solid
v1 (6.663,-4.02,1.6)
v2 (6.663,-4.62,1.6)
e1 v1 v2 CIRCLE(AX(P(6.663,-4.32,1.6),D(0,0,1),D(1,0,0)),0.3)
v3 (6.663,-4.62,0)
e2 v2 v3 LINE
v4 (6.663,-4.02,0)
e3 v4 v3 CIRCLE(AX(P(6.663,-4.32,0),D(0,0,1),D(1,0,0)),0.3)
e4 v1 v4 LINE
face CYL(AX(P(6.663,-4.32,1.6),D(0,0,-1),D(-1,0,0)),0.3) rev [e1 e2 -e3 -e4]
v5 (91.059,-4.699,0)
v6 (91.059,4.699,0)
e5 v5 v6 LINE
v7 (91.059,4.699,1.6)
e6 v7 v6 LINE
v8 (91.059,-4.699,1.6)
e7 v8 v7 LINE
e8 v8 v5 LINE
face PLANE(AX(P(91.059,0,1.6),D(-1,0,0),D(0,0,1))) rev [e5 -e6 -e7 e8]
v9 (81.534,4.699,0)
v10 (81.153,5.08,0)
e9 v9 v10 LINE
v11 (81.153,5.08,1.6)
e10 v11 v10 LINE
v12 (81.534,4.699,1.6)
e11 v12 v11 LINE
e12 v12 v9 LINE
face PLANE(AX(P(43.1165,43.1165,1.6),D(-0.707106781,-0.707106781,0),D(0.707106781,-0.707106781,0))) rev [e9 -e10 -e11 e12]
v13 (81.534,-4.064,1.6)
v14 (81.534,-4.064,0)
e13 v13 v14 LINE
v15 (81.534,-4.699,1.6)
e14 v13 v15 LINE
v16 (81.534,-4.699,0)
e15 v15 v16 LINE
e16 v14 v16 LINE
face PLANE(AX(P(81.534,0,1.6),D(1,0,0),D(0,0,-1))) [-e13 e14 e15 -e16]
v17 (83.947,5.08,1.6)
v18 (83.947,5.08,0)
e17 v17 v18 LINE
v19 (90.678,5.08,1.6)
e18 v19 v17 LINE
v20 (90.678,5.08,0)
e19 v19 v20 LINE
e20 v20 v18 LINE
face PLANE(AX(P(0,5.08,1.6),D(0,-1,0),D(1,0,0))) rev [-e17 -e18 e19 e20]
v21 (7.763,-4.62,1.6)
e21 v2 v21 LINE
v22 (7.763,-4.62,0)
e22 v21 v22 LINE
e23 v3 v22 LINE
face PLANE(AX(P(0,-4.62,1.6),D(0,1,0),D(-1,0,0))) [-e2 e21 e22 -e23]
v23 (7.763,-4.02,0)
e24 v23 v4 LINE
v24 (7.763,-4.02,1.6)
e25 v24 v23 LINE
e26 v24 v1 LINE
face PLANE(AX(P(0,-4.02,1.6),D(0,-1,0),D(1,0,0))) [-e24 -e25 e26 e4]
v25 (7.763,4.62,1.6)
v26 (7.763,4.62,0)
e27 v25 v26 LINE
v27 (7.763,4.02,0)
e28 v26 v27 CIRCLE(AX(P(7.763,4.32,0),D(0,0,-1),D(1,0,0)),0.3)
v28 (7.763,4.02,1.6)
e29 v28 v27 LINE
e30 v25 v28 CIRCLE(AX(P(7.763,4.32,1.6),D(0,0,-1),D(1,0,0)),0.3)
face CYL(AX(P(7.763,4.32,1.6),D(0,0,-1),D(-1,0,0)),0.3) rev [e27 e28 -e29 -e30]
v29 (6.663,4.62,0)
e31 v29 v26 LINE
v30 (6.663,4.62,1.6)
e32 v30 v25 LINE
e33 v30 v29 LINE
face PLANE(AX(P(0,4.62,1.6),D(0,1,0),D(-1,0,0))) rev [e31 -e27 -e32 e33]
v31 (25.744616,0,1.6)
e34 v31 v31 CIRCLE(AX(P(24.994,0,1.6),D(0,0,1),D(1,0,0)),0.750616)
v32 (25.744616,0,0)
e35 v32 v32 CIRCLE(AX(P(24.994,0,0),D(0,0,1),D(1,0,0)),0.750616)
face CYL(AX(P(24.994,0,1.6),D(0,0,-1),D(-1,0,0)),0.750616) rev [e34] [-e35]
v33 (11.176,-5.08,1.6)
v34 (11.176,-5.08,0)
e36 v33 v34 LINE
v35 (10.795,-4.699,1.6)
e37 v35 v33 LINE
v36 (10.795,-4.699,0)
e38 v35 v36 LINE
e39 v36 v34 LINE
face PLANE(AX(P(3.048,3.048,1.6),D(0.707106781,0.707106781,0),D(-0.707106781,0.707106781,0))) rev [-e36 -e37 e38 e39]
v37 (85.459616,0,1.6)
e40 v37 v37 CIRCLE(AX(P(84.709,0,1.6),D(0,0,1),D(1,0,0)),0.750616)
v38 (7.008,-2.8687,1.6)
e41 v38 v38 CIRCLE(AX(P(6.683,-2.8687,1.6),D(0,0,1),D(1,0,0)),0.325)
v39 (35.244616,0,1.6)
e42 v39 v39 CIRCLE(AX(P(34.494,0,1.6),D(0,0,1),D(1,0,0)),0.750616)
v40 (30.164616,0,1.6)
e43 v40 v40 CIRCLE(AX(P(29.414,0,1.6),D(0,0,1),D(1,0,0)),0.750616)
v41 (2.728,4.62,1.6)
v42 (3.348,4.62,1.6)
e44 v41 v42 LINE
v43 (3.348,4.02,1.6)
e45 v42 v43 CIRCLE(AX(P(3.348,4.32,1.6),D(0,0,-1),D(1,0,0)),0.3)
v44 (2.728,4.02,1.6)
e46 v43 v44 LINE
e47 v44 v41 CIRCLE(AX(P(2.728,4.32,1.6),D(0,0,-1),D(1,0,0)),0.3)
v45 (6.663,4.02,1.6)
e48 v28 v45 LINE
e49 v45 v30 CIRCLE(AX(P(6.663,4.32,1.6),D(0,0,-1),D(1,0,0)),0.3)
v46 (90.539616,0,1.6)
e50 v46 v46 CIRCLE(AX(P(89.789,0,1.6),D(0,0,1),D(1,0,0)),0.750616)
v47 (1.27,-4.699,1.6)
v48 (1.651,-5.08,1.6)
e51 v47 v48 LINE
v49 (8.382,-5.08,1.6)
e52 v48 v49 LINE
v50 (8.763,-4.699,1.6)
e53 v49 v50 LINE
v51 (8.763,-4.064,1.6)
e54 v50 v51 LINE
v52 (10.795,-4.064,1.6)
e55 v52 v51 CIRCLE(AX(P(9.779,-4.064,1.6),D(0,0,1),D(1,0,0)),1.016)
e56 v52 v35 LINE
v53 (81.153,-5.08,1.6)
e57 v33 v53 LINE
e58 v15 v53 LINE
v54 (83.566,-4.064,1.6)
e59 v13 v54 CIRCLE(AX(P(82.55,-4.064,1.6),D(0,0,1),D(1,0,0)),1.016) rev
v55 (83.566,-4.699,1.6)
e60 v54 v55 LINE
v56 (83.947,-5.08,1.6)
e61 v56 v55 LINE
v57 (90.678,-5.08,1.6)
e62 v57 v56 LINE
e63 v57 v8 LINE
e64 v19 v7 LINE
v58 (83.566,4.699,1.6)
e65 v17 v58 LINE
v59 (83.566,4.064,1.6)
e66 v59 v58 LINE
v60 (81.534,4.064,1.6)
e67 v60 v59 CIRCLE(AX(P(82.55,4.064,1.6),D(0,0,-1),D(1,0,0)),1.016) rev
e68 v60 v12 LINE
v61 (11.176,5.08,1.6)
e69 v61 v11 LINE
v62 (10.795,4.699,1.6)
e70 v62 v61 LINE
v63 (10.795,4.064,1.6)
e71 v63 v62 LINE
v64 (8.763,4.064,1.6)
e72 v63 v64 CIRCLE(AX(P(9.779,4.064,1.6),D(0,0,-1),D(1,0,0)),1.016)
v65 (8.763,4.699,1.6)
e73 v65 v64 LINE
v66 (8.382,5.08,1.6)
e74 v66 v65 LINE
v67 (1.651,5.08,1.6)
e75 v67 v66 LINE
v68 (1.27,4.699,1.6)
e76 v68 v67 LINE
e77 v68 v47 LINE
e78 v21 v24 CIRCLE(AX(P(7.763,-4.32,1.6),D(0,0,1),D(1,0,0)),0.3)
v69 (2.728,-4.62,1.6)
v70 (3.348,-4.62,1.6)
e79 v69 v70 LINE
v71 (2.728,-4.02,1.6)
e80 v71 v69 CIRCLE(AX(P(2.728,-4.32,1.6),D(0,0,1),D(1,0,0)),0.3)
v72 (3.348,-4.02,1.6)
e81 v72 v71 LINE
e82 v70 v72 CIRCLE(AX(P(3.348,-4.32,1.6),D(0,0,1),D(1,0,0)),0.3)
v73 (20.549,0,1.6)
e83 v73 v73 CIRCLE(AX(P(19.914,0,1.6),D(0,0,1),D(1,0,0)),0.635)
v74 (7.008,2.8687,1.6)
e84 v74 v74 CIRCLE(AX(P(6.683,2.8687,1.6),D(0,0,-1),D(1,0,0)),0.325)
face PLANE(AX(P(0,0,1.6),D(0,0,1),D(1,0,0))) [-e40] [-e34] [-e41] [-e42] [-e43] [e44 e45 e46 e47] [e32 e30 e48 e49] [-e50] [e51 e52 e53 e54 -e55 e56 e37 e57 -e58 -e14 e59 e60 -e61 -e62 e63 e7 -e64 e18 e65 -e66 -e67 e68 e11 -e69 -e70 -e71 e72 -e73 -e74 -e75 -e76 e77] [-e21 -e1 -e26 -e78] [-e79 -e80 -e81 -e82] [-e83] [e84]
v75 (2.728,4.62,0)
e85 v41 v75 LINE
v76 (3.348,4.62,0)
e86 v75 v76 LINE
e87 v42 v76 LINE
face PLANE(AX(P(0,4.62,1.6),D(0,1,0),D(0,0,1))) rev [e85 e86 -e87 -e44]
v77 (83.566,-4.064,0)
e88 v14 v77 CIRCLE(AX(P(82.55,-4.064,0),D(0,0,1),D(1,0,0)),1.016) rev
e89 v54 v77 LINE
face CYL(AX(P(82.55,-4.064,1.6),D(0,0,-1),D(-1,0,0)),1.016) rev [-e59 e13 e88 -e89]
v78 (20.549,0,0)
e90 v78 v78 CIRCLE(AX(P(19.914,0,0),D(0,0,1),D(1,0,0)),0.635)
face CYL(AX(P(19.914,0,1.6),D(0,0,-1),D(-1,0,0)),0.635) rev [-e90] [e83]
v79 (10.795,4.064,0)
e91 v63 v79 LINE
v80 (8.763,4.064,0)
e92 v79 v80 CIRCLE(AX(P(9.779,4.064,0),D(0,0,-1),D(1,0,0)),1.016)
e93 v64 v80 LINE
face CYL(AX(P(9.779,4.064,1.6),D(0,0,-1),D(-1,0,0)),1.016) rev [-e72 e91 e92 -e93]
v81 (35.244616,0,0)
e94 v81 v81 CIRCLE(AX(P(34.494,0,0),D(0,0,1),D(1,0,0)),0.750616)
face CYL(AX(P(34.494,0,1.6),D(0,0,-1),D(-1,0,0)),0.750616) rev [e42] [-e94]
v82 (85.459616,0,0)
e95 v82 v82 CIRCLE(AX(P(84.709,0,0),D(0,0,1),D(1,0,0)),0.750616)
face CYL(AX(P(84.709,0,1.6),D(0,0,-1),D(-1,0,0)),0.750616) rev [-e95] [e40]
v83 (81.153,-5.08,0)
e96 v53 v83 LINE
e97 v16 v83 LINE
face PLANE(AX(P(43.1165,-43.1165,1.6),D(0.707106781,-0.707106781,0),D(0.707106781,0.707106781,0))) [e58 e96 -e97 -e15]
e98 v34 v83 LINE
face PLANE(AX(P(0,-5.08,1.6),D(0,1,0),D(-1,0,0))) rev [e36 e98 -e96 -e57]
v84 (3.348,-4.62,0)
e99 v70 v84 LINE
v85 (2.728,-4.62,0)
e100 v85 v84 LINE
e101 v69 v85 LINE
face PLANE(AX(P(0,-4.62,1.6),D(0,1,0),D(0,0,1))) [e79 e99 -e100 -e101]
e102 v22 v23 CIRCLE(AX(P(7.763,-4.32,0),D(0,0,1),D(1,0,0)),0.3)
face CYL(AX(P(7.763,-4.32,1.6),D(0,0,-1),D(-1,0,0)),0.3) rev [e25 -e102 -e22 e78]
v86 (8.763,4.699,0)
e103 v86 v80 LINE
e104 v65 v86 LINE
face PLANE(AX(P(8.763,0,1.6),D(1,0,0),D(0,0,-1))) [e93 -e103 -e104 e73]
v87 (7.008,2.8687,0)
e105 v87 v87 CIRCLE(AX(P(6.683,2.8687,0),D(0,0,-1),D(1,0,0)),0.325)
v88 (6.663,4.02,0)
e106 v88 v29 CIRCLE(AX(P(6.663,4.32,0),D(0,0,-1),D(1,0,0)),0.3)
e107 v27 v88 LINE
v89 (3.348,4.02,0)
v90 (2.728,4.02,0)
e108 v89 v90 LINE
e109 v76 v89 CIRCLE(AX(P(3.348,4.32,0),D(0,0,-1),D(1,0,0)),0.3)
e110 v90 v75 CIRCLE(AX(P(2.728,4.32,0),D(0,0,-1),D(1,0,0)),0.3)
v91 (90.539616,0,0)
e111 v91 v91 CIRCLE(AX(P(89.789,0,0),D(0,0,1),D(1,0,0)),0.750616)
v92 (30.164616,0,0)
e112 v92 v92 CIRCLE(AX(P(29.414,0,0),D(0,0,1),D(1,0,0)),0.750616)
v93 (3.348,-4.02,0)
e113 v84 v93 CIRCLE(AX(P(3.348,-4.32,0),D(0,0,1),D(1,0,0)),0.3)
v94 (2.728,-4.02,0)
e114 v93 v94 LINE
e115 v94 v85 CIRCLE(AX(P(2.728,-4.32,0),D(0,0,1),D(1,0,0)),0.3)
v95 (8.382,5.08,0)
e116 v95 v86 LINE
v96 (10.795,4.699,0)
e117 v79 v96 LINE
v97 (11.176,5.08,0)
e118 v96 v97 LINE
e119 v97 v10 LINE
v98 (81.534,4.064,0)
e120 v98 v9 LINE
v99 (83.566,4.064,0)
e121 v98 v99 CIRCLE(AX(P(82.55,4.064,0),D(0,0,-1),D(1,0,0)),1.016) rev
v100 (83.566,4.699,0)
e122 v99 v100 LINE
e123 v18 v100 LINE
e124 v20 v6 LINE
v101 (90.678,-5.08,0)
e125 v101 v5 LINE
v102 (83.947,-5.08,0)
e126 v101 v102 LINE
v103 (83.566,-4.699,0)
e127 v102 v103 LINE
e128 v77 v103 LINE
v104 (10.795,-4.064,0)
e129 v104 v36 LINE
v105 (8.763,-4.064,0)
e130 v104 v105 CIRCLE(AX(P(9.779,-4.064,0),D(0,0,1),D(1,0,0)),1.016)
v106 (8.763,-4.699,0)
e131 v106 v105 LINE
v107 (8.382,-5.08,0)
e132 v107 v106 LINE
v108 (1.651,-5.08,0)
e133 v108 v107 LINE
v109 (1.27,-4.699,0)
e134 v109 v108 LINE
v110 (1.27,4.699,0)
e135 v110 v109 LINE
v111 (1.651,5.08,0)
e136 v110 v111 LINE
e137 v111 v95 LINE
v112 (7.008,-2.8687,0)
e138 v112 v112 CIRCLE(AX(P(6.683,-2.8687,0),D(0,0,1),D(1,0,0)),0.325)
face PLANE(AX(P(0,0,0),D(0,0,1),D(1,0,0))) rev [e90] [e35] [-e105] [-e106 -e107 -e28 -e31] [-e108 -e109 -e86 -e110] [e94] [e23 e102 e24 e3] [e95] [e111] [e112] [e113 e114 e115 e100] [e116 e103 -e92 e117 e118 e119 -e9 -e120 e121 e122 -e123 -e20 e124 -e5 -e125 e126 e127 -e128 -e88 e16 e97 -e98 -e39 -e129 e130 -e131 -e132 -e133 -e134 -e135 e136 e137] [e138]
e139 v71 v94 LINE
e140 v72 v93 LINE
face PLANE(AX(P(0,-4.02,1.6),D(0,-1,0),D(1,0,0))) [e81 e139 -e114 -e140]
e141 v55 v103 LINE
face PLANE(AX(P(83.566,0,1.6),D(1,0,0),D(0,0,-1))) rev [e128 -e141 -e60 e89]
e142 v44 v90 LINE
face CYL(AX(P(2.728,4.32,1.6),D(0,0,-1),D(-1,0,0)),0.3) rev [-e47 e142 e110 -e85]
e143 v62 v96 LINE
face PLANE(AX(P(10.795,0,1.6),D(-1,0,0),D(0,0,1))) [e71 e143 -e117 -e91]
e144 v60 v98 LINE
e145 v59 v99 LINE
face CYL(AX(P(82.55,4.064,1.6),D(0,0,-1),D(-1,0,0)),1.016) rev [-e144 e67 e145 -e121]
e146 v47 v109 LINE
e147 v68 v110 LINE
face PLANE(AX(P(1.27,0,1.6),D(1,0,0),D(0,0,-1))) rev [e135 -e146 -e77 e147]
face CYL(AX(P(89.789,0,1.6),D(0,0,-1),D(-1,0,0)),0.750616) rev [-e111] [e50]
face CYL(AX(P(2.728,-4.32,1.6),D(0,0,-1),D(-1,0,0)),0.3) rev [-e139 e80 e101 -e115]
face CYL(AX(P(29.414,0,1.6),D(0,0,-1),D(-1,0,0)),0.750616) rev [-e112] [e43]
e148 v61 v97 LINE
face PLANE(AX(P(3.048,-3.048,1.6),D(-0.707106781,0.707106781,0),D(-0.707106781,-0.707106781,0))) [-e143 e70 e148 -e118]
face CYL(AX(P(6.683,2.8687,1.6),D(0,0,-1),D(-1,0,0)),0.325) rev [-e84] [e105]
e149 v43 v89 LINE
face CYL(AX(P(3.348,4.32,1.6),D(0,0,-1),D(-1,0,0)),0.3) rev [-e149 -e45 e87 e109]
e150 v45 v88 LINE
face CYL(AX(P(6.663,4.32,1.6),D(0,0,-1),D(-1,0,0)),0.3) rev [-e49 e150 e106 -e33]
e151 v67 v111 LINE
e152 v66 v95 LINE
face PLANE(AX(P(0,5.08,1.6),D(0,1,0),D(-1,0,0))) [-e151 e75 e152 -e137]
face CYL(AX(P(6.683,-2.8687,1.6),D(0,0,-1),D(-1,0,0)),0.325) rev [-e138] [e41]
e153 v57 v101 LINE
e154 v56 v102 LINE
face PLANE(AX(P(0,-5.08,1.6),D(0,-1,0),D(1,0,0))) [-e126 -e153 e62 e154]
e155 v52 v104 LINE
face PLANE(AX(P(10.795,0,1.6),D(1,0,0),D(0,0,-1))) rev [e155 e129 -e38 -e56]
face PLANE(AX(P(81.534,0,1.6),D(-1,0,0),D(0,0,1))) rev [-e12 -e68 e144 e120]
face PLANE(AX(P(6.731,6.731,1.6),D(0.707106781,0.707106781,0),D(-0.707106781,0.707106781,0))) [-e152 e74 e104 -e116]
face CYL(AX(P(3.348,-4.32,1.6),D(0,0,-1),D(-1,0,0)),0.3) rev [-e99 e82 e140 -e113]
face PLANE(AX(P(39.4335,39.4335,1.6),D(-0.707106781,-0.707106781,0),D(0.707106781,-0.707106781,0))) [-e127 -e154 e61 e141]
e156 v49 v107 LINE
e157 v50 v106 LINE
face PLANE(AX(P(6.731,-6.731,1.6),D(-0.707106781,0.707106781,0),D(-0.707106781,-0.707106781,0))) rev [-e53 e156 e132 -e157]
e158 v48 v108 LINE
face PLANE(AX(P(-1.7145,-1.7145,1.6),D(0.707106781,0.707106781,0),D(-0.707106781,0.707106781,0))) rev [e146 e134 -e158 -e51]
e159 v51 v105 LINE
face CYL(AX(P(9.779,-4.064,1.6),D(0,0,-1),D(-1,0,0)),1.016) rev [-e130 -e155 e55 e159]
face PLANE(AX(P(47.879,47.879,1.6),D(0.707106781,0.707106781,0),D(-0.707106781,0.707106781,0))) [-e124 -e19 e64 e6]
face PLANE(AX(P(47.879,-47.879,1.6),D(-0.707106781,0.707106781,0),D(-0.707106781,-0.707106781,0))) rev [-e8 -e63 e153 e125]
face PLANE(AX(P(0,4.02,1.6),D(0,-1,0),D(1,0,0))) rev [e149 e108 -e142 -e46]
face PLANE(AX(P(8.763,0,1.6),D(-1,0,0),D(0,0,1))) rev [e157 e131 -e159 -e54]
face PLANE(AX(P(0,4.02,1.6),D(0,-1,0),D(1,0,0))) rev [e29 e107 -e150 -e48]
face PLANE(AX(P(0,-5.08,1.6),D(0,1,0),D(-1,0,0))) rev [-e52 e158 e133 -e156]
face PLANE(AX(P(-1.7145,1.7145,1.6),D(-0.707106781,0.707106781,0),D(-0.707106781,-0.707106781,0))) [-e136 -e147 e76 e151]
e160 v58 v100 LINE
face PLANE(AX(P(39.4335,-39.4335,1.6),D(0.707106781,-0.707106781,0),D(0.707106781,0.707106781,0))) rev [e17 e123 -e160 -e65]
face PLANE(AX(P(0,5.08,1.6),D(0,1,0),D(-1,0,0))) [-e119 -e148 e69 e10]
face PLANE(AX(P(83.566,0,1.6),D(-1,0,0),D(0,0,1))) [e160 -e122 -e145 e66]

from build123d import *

# Parameters (mm, degrees)
EXTRUDE_1_OUTLINE_R = 0.325
EXTRUDE_1_DEPTH     = 1.6
SKETCH_1_R          = 0.635
SKETCH_1_R_2        = 0.750616105
CUT_EXTRUDE_1_DEPTH = 92.214625368


# Read off the part's stored shape, not the designer's step: 凸台-拉伸1
with BuildPart() as part:
    # 凸台-拉伸1 outline → 凸台-拉伸1 (new body)
    with BuildSketch(Plane.XY):
        with BuildLine():
            Line((81.153, -5.08), (81.534, -4.699))
            Line((81.534, -4.699), (81.534, -4.064))
            ThreePointArc((81.534, -4.064), (82.55, -3.048), (83.566, -4.064))
            Line((83.566, -4.064), (83.566, -4.699))
            Line((83.566, -4.699), (83.947, -5.08))
            Line((83.947, -5.08), (90.678, -5.08))
            Line((90.678, -5.08), (91.059, -4.699))
            Line((91.059, -4.699), (91.059, 0))
            Line((91.059, 0), (1.27, 0))
            Line((1.27, 0), (1.27, -4.699))
            Line((1.27, -4.699), (1.651, -5.08))
            Line((1.651, -5.08), (8.382, -5.08))
            Line((8.382, -5.08), (8.763, -4.699))
            Line((8.763, -4.699), (8.763, -4.064))
            ThreePointArc((8.763, -4.064), (9.779, -3.048), (10.795, -4.064))
            Line((10.795, -4.064), (10.795, -4.699))
            Line((10.795, -4.699), (11.176, -5.08))
            Line((11.176, -5.08), (81.153, -5.08))
        make_face()
        with BuildLine():
            Line((2.728, -4.02), (3.348, -4.02))
            ThreePointArc((3.348, -4.02), (3.648, -4.32), (3.348, -4.62))
            Line((3.348, -4.62), (2.728, -4.62))
            ThreePointArc((2.728, -4.62), (2.428, -4.32), (2.728, -4.02))
        make_face(mode=Mode.SUBTRACT)
        with BuildLine():
            Line((7.763, -4.62), (6.663, -4.62))
            ThreePointArc((6.663, -4.62), (6.363, -4.32), (6.663, -4.02))
            Line((6.663, -4.02), (7.763, -4.02))
            ThreePointArc((7.763, -4.02), (8.063, -4.32), (7.763, -4.62))
        make_face(mode=Mode.SUBTRACT)
        with Locations((6.683, -2.8687)):
            Circle(EXTRUDE_1_OUTLINE_R, mode=Mode.SUBTRACT)
    extrude_1 = extrude(amount=EXTRUDE_1_DEPTH)

    # 镜向1: 凸台-拉伸1 across plane
    add(extrude_1.mirror(Plane(origin=(0, 0, 1.6), x_dir=(0, 0, 1), z_dir=(0, 1, 0))))

    # 草图1 → 切除-拉伸1 (cut, through all)
    with BuildSketch(Plane.XY):
        with Locations((19.914, 0)):
            Circle(SKETCH_1_R)
        with Locations((24.994, 0)):
            Circle(SKETCH_1_R_2)
        with Locations((29.414, 0)):
            Circle(SKETCH_1_R_2)
        with Locations((34.494, 0)):
            Circle(SKETCH_1_R_2)
        with Locations((89.789, 0)):
            Circle(SKETCH_1_R_2)
        with Locations((84.709, 0)):
            Circle(SKETCH_1_R_2)
    extrude(amount=CUT_EXTRUDE_1_DEPTH, mode=Mode.SUBTRACT)


solid = part.part
